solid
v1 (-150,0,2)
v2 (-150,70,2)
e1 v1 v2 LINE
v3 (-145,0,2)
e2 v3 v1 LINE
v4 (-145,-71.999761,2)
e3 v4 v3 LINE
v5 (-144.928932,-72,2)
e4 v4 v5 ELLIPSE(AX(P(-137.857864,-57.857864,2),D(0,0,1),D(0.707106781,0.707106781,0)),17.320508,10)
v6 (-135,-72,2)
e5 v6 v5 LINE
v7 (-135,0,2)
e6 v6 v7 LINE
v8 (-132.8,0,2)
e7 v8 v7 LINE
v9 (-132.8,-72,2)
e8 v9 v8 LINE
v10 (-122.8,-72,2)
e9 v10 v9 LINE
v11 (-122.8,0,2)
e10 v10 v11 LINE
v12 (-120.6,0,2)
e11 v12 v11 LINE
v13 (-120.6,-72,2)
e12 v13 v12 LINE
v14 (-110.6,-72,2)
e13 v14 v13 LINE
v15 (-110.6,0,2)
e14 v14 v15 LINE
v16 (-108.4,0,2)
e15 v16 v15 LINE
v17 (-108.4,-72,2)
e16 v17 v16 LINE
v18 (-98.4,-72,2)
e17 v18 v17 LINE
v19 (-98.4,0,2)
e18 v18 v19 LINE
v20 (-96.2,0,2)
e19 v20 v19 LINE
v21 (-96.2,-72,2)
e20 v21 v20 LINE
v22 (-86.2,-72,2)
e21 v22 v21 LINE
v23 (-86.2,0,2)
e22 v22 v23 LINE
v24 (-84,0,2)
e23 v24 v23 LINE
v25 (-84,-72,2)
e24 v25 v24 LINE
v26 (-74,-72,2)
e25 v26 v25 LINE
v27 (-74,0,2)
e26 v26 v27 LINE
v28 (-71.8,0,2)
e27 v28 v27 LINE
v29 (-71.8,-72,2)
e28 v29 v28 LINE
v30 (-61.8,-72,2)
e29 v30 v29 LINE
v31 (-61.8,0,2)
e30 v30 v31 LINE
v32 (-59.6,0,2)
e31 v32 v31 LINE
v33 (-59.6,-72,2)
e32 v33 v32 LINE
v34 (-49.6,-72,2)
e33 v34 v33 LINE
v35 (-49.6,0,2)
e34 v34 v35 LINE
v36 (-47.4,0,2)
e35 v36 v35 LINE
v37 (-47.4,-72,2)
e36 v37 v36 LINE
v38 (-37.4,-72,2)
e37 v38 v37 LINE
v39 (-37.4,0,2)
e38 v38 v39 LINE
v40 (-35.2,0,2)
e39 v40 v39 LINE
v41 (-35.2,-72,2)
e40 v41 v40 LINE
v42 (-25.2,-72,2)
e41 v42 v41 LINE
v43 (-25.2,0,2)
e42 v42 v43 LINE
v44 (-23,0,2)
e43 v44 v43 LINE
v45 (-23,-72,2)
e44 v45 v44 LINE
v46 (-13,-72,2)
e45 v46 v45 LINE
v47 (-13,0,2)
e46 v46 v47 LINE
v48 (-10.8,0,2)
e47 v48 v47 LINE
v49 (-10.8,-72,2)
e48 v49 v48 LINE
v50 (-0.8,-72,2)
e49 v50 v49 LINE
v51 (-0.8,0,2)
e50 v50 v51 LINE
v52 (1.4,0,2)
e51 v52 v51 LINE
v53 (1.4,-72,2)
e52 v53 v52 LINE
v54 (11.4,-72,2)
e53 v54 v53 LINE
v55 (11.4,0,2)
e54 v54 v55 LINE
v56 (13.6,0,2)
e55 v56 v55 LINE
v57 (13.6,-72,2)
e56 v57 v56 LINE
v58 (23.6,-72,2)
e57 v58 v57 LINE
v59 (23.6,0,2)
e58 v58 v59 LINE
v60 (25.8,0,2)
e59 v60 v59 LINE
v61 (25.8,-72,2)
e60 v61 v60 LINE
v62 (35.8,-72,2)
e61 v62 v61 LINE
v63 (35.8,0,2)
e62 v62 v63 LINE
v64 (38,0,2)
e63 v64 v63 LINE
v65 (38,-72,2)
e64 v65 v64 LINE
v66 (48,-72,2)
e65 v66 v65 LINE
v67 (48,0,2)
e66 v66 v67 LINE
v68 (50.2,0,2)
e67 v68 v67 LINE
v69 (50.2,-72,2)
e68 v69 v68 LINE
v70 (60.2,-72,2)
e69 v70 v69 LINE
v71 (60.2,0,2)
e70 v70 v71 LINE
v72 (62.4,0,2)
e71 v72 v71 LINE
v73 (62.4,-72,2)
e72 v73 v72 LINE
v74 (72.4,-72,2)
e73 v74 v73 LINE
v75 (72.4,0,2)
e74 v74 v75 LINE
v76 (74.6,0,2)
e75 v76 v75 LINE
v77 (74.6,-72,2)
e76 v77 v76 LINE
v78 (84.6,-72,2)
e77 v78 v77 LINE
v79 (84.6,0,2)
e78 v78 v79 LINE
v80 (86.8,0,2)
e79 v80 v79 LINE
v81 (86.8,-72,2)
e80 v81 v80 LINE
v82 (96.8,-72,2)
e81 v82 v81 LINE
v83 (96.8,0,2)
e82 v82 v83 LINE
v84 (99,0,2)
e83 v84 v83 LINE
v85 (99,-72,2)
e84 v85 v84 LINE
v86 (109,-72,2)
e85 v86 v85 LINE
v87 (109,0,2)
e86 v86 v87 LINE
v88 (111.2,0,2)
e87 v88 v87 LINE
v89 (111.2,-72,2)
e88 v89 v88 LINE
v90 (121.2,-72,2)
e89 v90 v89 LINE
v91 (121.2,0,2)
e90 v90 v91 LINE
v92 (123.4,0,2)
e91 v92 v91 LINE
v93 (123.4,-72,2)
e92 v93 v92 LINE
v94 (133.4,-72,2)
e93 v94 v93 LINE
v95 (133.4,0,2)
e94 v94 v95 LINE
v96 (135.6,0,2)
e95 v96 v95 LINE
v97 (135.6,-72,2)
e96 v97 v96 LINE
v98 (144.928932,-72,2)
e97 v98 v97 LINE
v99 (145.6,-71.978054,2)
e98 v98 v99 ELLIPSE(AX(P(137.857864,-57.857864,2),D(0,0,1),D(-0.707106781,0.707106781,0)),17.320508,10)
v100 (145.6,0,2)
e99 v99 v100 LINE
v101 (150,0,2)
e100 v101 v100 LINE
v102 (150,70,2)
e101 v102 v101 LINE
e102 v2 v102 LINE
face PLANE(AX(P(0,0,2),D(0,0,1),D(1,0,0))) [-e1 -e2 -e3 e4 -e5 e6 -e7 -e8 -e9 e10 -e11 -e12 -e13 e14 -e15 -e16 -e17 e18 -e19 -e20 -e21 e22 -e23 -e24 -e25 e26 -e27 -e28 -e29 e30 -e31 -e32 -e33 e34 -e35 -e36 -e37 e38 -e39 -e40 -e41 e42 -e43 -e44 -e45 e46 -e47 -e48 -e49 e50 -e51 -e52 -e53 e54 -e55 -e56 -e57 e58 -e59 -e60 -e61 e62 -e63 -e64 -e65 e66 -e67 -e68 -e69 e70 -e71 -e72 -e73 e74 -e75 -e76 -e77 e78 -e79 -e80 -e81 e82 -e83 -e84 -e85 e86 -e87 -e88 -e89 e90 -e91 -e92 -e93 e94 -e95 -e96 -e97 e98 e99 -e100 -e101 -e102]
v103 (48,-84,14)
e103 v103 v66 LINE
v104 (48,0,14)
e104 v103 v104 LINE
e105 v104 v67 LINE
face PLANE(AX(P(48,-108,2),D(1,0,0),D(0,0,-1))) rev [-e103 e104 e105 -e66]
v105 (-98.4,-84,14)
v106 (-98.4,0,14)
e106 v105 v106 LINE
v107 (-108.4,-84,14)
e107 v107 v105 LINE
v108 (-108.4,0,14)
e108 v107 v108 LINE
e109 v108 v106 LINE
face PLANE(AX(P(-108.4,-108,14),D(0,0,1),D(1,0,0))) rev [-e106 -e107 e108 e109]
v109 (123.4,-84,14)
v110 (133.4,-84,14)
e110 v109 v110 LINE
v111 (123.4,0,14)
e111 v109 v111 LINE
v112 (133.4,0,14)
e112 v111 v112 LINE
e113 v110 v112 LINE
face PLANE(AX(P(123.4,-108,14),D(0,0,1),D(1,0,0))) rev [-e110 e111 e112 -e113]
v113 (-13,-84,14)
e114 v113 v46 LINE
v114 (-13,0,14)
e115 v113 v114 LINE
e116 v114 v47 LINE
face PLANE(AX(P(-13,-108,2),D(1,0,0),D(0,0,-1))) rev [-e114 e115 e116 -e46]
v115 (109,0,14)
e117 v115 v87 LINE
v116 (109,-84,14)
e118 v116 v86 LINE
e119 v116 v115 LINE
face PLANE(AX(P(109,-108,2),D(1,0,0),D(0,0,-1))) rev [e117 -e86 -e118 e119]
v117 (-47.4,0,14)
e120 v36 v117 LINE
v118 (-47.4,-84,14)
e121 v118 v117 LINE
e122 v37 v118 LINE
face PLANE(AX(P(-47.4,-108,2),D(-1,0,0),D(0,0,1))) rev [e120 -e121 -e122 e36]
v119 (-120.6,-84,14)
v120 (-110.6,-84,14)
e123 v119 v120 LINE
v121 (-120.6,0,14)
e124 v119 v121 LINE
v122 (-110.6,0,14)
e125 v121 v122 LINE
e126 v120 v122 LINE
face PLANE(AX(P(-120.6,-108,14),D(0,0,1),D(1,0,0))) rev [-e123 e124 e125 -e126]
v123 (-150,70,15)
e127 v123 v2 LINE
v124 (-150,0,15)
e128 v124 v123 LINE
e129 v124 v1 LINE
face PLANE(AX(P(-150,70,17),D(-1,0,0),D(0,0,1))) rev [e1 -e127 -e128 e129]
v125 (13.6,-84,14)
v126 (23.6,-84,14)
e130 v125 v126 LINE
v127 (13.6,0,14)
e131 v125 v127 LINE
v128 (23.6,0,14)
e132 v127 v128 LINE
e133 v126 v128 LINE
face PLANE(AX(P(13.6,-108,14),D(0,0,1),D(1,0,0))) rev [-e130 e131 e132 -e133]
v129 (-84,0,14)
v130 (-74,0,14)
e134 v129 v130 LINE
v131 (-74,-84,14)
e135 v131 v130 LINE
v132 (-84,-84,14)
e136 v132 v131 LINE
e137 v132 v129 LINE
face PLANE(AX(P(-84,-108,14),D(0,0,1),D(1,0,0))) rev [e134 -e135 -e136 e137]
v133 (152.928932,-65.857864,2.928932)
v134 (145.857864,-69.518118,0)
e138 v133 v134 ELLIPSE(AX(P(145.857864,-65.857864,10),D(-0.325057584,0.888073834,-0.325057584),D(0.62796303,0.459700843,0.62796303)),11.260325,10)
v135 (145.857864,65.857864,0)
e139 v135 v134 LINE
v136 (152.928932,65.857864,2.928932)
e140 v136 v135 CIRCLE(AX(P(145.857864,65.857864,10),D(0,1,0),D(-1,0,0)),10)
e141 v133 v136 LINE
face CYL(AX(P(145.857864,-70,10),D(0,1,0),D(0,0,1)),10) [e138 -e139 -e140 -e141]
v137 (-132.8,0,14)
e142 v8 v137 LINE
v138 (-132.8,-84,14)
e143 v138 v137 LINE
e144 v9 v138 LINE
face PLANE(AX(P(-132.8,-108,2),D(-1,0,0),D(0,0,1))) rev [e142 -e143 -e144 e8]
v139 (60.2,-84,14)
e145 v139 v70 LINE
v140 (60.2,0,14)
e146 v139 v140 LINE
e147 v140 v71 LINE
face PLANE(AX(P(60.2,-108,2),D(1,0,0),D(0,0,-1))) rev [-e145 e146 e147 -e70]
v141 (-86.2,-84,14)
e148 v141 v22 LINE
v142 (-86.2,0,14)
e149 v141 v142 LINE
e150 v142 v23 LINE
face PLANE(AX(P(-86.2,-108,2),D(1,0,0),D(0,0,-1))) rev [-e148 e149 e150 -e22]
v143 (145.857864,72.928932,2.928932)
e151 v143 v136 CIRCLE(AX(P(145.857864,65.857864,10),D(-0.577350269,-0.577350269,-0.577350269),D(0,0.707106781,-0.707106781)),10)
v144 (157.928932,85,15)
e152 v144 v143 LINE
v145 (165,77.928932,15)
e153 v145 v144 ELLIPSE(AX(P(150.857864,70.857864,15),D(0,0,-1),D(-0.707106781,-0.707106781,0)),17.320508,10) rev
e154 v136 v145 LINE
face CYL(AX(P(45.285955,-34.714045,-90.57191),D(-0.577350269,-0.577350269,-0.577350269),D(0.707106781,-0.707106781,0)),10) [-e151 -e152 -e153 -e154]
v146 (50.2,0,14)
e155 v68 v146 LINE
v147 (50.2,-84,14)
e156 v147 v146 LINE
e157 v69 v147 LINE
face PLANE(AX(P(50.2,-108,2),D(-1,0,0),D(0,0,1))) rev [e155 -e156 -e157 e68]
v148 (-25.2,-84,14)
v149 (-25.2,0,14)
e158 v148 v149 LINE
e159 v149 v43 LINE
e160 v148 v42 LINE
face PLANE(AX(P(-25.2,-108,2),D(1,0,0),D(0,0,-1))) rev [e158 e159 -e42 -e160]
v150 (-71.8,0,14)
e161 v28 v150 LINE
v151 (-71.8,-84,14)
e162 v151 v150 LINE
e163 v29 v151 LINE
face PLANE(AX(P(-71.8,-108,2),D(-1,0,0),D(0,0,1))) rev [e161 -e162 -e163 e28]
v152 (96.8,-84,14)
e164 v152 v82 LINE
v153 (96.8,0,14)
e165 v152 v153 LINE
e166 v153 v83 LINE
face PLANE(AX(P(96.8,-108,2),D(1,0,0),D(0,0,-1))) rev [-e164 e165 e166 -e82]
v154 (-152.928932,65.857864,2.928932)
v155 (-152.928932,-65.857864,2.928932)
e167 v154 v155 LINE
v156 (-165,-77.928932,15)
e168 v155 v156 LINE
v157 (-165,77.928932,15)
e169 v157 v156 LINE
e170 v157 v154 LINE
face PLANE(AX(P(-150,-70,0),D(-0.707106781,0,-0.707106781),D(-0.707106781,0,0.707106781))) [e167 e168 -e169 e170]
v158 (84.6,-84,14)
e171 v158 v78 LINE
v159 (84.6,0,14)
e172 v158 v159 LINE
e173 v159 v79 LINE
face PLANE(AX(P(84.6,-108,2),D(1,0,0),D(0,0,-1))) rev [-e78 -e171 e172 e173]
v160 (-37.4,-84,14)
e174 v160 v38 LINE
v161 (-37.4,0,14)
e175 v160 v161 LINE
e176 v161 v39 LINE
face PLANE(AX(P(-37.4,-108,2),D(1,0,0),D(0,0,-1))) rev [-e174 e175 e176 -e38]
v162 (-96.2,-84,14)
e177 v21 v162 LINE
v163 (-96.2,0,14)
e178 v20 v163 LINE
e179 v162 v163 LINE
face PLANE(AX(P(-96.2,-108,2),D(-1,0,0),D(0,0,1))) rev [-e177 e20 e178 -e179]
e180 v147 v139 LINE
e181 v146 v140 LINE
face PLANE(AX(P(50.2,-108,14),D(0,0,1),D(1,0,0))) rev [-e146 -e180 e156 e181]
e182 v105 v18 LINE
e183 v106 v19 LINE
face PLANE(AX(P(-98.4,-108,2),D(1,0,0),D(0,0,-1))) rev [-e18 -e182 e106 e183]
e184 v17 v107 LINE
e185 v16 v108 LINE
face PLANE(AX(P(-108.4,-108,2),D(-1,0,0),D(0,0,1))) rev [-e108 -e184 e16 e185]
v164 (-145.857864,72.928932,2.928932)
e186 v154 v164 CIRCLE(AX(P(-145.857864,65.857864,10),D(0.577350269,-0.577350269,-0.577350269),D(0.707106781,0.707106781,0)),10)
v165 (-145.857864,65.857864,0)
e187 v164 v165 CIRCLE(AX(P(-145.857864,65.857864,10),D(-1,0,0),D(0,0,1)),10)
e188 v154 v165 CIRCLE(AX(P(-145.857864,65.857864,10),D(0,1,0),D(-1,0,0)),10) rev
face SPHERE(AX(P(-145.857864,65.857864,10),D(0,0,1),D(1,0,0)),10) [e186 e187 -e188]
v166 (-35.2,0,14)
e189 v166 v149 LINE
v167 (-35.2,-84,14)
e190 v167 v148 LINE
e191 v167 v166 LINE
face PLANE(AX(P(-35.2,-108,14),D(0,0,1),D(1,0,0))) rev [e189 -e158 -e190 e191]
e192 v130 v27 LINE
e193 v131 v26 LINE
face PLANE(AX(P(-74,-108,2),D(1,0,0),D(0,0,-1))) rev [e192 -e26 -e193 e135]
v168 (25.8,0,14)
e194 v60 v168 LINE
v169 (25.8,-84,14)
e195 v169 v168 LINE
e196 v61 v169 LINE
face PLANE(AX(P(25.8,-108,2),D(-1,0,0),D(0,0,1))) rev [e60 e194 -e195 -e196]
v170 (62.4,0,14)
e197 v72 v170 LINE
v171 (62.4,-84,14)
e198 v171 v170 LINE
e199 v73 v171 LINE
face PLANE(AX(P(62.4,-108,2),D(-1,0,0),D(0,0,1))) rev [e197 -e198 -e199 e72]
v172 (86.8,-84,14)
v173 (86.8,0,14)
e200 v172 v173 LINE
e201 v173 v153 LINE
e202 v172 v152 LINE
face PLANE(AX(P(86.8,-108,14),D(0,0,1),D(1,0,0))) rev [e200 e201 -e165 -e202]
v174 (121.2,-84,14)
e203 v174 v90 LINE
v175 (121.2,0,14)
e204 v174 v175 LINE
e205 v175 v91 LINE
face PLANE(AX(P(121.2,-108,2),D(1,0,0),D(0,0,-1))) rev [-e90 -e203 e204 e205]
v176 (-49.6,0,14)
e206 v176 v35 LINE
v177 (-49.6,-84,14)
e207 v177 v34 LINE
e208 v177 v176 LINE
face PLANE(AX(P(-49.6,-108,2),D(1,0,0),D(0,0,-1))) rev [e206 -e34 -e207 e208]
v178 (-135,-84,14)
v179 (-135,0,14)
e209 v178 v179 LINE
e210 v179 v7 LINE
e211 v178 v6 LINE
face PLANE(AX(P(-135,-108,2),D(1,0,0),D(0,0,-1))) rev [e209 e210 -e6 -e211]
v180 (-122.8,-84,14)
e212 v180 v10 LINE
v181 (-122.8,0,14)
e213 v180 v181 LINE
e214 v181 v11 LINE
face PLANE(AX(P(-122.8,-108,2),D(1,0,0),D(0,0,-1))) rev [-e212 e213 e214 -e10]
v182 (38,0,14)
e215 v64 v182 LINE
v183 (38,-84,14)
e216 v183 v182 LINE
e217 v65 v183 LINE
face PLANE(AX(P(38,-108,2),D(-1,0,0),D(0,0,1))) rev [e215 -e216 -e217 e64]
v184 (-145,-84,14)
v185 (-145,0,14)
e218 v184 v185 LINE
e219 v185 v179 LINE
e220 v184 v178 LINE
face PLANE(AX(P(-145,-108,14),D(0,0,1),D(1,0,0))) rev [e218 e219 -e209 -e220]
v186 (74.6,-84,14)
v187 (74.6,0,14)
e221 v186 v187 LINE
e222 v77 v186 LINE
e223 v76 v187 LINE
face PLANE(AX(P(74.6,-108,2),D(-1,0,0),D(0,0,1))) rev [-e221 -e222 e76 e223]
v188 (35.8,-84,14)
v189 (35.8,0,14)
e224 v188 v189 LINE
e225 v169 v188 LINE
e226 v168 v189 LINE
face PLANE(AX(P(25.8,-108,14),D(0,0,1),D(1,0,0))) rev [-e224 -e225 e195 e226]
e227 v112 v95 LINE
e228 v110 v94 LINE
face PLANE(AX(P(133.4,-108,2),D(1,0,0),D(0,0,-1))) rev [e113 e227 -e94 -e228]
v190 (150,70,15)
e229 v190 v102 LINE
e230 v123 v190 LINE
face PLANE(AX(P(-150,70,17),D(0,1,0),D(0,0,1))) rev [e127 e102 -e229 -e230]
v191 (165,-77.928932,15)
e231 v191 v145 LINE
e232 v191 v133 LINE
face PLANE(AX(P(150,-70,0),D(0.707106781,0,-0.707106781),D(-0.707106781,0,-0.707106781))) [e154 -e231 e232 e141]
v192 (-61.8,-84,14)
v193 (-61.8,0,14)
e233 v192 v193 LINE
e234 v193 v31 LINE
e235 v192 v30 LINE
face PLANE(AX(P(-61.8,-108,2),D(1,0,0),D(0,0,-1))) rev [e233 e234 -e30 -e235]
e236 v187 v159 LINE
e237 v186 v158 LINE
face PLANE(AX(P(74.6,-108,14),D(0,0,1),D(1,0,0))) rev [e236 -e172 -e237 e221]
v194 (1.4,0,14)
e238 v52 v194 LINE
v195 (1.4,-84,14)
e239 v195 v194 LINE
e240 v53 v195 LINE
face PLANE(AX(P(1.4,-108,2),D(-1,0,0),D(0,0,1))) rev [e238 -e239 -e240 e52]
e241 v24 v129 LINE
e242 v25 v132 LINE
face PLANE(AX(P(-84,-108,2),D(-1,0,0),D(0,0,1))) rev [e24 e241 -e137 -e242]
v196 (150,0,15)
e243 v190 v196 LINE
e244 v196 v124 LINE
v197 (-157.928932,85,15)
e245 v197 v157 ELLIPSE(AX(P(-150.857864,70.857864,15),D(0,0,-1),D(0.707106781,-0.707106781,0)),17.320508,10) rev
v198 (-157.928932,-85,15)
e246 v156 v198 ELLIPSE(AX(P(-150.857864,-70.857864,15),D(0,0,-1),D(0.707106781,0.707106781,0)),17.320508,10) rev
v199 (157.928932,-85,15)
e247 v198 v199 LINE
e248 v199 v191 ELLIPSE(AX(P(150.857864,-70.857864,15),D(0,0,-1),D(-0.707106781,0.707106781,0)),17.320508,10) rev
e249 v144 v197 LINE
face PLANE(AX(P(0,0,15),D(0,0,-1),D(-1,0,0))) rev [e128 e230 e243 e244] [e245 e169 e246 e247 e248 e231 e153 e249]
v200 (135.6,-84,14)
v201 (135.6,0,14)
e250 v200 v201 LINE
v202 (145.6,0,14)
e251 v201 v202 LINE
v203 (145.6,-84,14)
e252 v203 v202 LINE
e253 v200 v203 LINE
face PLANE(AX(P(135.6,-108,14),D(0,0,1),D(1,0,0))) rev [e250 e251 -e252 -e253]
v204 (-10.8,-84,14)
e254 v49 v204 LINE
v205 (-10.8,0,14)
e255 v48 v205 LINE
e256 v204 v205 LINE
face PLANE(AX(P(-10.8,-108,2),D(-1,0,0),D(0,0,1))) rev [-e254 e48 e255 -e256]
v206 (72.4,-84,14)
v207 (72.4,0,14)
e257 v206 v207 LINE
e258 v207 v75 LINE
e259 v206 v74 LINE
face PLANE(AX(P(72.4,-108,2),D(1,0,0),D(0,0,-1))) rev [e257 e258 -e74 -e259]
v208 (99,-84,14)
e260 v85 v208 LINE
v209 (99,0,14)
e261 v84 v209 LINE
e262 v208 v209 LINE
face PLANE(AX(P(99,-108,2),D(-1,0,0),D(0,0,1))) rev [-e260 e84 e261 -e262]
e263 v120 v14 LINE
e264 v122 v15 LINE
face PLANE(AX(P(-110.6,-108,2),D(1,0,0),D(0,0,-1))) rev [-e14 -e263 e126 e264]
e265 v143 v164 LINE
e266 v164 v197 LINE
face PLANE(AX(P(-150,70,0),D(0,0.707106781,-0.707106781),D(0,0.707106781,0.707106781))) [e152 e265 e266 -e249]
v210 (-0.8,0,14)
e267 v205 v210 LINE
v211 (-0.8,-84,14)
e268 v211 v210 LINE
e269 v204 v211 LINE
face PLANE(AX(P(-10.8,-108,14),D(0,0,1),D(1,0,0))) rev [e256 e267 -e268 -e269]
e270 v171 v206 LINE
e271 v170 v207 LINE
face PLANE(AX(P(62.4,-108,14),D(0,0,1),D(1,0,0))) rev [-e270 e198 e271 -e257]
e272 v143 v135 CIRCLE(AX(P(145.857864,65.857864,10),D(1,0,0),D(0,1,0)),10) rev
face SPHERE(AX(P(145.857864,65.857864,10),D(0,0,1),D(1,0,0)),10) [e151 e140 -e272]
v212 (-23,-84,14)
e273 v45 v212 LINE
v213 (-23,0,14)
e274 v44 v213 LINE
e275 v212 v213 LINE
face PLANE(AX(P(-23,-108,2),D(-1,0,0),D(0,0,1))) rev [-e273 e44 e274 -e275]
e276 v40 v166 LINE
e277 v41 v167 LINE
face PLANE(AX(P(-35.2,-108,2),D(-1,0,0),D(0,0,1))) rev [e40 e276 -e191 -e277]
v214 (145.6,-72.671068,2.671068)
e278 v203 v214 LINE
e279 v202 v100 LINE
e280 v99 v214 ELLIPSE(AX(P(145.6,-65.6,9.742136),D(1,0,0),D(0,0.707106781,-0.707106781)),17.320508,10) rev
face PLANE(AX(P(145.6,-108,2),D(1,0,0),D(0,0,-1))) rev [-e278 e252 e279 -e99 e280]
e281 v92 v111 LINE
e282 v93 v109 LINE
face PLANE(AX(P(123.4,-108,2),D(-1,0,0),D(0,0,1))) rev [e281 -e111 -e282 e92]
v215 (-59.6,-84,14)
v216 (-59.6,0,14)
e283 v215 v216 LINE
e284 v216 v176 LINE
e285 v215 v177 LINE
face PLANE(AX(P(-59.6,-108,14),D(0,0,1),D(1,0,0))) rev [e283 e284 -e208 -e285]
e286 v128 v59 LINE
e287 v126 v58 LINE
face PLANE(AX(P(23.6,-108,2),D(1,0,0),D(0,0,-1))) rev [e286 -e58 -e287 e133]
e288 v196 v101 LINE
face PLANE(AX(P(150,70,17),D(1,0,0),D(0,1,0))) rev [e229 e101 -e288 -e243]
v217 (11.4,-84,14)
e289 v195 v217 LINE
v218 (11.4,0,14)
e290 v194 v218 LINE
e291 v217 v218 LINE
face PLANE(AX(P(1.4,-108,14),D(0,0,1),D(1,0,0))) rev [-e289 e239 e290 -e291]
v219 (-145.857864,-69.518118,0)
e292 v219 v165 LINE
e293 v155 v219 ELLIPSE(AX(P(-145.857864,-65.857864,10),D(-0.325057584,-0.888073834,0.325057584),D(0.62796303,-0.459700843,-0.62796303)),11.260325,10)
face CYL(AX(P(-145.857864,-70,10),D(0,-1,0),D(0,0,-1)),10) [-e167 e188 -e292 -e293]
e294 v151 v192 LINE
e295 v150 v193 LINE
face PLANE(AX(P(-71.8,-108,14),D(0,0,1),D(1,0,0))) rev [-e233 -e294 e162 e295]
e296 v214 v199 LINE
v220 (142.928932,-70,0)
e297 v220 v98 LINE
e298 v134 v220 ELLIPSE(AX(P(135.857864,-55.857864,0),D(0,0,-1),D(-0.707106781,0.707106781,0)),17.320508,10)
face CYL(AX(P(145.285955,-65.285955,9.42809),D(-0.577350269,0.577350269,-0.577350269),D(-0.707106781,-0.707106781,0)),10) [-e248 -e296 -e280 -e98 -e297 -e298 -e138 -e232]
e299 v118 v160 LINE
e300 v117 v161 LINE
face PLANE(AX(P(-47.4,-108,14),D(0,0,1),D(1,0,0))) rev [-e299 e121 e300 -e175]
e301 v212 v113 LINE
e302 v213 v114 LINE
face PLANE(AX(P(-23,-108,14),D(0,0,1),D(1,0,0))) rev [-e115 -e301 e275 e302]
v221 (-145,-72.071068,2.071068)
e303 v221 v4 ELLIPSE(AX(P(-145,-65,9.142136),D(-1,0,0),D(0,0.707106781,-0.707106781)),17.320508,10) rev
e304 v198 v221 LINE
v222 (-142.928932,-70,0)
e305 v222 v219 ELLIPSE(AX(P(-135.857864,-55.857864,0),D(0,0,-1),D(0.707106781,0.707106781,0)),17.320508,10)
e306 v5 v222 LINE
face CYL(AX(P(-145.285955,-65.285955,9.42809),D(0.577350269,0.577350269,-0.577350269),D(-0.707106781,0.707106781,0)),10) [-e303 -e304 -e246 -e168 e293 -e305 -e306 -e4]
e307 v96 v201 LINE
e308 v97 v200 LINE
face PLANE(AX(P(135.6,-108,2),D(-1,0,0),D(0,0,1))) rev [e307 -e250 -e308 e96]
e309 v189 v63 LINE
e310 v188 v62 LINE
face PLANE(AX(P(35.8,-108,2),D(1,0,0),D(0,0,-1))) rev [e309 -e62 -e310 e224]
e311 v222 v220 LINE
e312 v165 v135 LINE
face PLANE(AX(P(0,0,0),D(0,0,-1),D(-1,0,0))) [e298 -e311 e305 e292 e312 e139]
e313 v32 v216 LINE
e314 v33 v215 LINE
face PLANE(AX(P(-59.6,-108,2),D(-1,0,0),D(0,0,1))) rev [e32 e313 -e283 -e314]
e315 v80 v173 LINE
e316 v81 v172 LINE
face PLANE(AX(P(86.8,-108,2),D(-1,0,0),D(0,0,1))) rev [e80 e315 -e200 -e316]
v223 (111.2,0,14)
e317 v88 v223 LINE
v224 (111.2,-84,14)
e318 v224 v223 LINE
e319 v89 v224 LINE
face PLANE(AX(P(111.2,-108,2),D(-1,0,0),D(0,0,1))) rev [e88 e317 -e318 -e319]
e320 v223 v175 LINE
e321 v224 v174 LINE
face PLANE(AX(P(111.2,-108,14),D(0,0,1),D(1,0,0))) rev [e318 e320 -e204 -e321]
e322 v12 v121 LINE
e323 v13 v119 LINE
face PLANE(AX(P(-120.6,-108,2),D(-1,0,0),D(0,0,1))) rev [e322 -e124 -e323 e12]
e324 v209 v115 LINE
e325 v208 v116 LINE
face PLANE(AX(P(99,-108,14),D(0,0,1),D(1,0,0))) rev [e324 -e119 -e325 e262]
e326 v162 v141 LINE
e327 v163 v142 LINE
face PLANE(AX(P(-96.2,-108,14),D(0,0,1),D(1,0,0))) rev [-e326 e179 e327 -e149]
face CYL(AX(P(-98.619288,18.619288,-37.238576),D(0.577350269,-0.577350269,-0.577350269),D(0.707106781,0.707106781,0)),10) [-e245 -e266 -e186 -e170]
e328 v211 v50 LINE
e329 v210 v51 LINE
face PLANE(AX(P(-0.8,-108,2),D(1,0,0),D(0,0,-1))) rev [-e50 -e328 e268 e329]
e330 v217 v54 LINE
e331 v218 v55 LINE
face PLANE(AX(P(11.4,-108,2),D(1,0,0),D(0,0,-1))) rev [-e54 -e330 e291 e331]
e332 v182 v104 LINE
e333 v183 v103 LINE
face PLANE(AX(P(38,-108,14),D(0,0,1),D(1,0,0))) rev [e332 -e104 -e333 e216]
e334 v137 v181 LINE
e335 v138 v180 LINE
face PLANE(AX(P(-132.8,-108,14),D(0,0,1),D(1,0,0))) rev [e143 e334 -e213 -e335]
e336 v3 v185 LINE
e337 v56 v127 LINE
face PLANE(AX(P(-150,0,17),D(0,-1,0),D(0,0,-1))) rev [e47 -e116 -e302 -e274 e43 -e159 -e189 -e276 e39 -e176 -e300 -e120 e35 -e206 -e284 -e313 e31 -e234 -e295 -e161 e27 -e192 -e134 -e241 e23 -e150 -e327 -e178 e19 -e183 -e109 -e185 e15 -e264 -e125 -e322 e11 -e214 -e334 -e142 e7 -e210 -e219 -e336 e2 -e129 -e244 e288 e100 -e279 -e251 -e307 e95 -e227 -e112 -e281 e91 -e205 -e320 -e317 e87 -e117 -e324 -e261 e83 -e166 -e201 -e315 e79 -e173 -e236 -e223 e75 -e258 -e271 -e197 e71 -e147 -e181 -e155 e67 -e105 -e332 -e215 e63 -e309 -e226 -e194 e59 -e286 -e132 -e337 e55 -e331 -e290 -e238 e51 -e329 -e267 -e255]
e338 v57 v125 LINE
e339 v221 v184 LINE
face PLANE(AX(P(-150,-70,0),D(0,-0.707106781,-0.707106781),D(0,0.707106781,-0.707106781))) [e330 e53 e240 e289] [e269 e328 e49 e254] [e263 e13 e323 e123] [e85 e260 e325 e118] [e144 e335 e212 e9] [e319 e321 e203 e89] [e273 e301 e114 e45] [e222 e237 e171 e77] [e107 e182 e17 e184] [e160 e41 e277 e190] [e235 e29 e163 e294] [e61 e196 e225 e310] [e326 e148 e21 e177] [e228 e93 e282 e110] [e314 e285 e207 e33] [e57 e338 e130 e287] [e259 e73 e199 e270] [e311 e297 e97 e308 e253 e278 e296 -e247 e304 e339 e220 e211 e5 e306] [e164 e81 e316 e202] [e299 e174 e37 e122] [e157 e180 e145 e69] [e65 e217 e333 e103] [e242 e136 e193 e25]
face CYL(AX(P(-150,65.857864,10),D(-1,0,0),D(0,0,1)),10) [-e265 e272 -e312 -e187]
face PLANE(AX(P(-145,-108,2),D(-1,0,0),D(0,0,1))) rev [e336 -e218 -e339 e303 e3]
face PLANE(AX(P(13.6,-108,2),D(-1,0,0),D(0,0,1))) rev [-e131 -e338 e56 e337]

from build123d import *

# Parameters (mm, degrees)
SZKIC1_W                    = 300
SZKIC1_H                    = 140
DODANIE_WYCI_GNI_CIE1_DEPTH = 15
DODANIE_WYCI_GNI_CIE1_DRAFT = -45
SZKIC2_W                    = 300
SZKIC2_H                    = 70
WYTNIJ_WYCI_GNI_CIE1_DEPTH  = 15
SZKIC3_W                    = 10
SZKIC3_H                    = 12
WYTNIJ_WYCI_GNI_CIE2_DEPTH  = 108
ZAOKR_GLENIE1_R             = 10


with BuildPart() as part:
    # Szkic1 → Dodanie-wyciągnięcie1 (with draft: the straight prism first)
    with BuildSketch(Plane.XY):
        Rectangle(SZKIC1_W, SZKIC1_H)
    extrude(amount=DODANIE_WYCI_GNI_CIE1_DEPTH)
    # Dodanie-wyciągnięcie1: the draft: its side faces are tilted about the plane it starts from
    dodanie_wyci_gni_cie1_sides = [part.faces().sort_by_distance(p)[0] for p in [
        (0, -70, 7.5),
        (150, 0, 7.5),
        (0, 70, 7.5),
        (-150, 0, 7.5),
    ]]
    draft(dodanie_wyci_gni_cie1_sides, Plane.XY, DODANIE_WYCI_GNI_CIE1_DRAFT)

    # Szkic2 → Wytnij-wyciągnięcie1 (cut)
    with BuildSketch(Plane(origin=(0, 0, 2), x_dir=(-1, 0, 0), z_dir=(0, 0, -1))):
        with Locations((0, 35)):
            Rectangle(SZKIC2_W, SZKIC2_H)
    extrude(amount=-WYTNIJ_WYCI_GNI_CIE1_DEPTH, mode=Mode.SUBTRACT)

    # Szkic3 → Wytnij-wyciągnięcie2 (cut)
    with BuildSketch(Plane(origin=(0, 0, 0), x_dir=(1, 0, 0), z_dir=(0, 1, 0))):
        with Locations((-140, -8)):
            Rectangle(SZKIC3_W, SZKIC3_H)
        with Locations((-127.8, -8)):
            Rectangle(SZKIC3_W, SZKIC3_H)
        with Locations((-115.6, -8)):
            Rectangle(SZKIC3_W, SZKIC3_H)
        with Locations((-103.4, -8)):
            Rectangle(SZKIC3_W, SZKIC3_H)
        with Locations((-91.2, -8)):
            Rectangle(SZKIC3_W, SZKIC3_H)
        with Locations((-79, -8)):
            Rectangle(SZKIC3_W, SZKIC3_H)
        with Locations((-66.8, -8)):
            Rectangle(SZKIC3_W, SZKIC3_H)
        with Locations((-54.6, -8)):
            Rectangle(SZKIC3_W, SZKIC3_H)
        with Locations((-42.4, -8)):
            Rectangle(SZKIC3_W, SZKIC3_H)
        with Locations((-30.2, -8)):
            Rectangle(SZKIC3_W, SZKIC3_H)
        with Locations((-18, -8)):
            Rectangle(SZKIC3_W, SZKIC3_H)
        with Locations((-5.8, -8)):
            Rectangle(SZKIC3_W, SZKIC3_H)
        with Locations((6.4, -8)):
            Rectangle(SZKIC3_W, SZKIC3_H)
        with Locations((18.6, -8)):
            Rectangle(SZKIC3_W, SZKIC3_H)
        with Locations((30.8, -8)):
            Rectangle(SZKIC3_W, SZKIC3_H)
        with Locations((43, -8)):
            Rectangle(SZKIC3_W, SZKIC3_H)
        with Locations((55.2, -8)):
            Rectangle(SZKIC3_W, SZKIC3_H)
        with Locations((67.4, -8)):
            Rectangle(SZKIC3_W, SZKIC3_H)
        with Locations((79.6, -8)):
            Rectangle(SZKIC3_W, SZKIC3_H)
        with Locations((91.8, -8)):
            Rectangle(SZKIC3_W, SZKIC3_H)
        with Locations((104, -8)):
            Rectangle(SZKIC3_W, SZKIC3_H)
        with Locations((116.2, -8)):
            Rectangle(SZKIC3_W, SZKIC3_H)
        with Locations((128.4, -8)):
            Rectangle(SZKIC3_W, SZKIC3_H)
        with Locations((140.6, -8)):
            Rectangle(SZKIC3_W, SZKIC3_H)
    extrude(amount=-WYTNIJ_WYCI_GNI_CIE2_DEPTH, mode=Mode.SUBTRACT)

    # Zaokrąglenie1
    # the kernel refuses this fillet: 10 mm, written as the material it takes off along each edge
    with BuildSketch(Plane(origin=(-145.857864376, 65.857864376, 10), x_dir=(-0.35740674433659364, 0.8628562094610169, 0.3574067443365923), z_dir=(-0.2705980500730978, 0.2705980500730978, -0.9238795325112871))) as zaokr_glenie1_piece_1_section:
        Polygon((-13.907299812, -13.907299812), (13.907299812, -13.907299812), (13.907299812, 13.907299812), (-13.907299812, 13.907299812), align=None)
    zaokr_glenie1_piece_1 = extrude(amount=13.907299812, mode=Mode.PRIVATE)
    zaokr_glenie1_piece_1 = split(zaokr_glenie1_piece_1, bisect_by=Plane(origin=(-145.857864376, 65.857864376, 10), z_dir=(0, 1, 0)), keep=Keep.TOP, mode=Mode.PRIVATE)
    zaokr_glenie1_piece_1 = split(zaokr_glenie1_piece_1, bisect_by=Plane(origin=(-145.857864376, 65.857864376, 10), z_dir=(-1, 0, 0)), keep=Keep.TOP, mode=Mode.PRIVATE)
    zaokr_glenie1_piece_1 = split(zaokr_glenie1_piece_1, bisect_by=Plane(origin=(-145.857864376, 65.857864376, 10), z_dir=(0.5773502691896265, -0.5773502691896265, -0.5773502691896244)), keep=Keep.TOP, mode=Mode.PRIVATE)
    zaokr_glenie1_piece_1 = split(zaokr_glenie1_piece_1, bisect_by=Plane(origin=(-152.928932188, 65.857864376, 2.928932188), z_dir=(0.7071067811865462, 0, 0.7071067811865488)), keep=Keep.TOP, mode=Mode.PRIVATE)
    zaokr_glenie1_piece_1 = split(zaokr_glenie1_piece_1, bisect_by=Plane(origin=(-145.857864376, 65.857864376, 0), z_dir=(0, 0, 1)), keep=Keep.TOP, mode=Mode.PRIVATE)
    zaokr_glenie1_piece_1 = split(zaokr_glenie1_piece_1, bisect_by=Plane(origin=(-145.857864376, 72.928932188, 2.928932188), z_dir=(0, -0.7071067811865462, 0.7071067811865488)), keep=Keep.TOP, mode=Mode.PRIVATE)
    zaokr_glenie1_piece_1 = zaokr_glenie1_piece_1 - Plane(origin=(-145.857864376, 65.857864376, 10), x_dir=(0.2705980500730978, -0.2705980500730978, 0.9238795325112871), z_dir=(-0.35740674433659364, 0.8628562094610169, 0.3574067443365923)) * Sphere(ZAOKR_GLENIE1_R, mode=Mode.PRIVATE)
    add(zaokr_glenie1_piece_1, mode=Mode.SUBTRACT)
    with BuildSketch(Plane(origin=(145.857864376, 65.857864376, 10), x_dir=(-0.7071067811865475, 0.7071067811865475, 0), z_dir=(0.2705980500730978, 0.2705980500730978, -0.9238795325112871))) as zaokr_glenie1_piece_2_section:
        Polygon((-13.907299812, -13.907299812), (13.907299812, -13.907299812), (13.907299812, 13.907299812), (-13.907299812, 13.907299812), align=None)
    zaokr_glenie1_piece_2 = extrude(amount=13.907299812, mode=Mode.PRIVATE)
    zaokr_glenie1_piece_2 = split(zaokr_glenie1_piece_2, bisect_by=Plane(origin=(145.857864376, 65.857864376, 10), z_dir=(0, 1, 0)), keep=Keep.TOP, mode=Mode.PRIVATE)
    zaokr_glenie1_piece_2 = split(zaokr_glenie1_piece_2, bisect_by=Plane(origin=(145.857864376, 65.857864376, 10), z_dir=(-0.5773502691896265, -0.5773502691896265, -0.5773502691896244)), keep=Keep.TOP, mode=Mode.PRIVATE)
    zaokr_glenie1_piece_2 = split(zaokr_glenie1_piece_2, bisect_by=Plane(origin=(145.857864376, 65.857864376, 10), z_dir=(1, 0, 0)), keep=Keep.TOP, mode=Mode.PRIVATE)
    zaokr_glenie1_piece_2 = split(zaokr_glenie1_piece_2, bisect_by=Plane(origin=(145.857864376, 65.857864376, 0), z_dir=(0, 0, 1)), keep=Keep.TOP, mode=Mode.PRIVATE)
    zaokr_glenie1_piece_2 = split(zaokr_glenie1_piece_2, bisect_by=Plane(origin=(152.928932188, 65.857864376, 2.928932188), z_dir=(-0.7071067811865462, 0, 0.7071067811865488)), keep=Keep.TOP, mode=Mode.PRIVATE)
    zaokr_glenie1_piece_2 = split(zaokr_glenie1_piece_2, bisect_by=Plane(origin=(145.857864376, 72.928932188, 2.928932188), z_dir=(0, -0.7071067811865462, 0.7071067811865488)), keep=Keep.TOP, mode=Mode.PRIVATE)
    zaokr_glenie1_piece_2 = zaokr_glenie1_piece_2 - Plane(origin=(145.857864376, 65.857864376, 10), x_dir=(-0.2705980500730978, -0.2705980500730978, 0.9238795325112871), z_dir=(-0.7071067811865475, 0.7071067811865475, 0)) * Sphere(ZAOKR_GLENIE1_R, mode=Mode.PRIVATE)
    add(zaokr_glenie1_piece_2, mode=Mode.SUBTRACT)
    with BuildSketch(Plane(origin=(-150, 65.857864376, 0), x_dir=(-0.7071067811865438, 0, 0.7071067811865511), z_dir=(0, -1, 0))) as zaokr_glenie1_piece_3:
        with BuildLine():
            CenterArc((ZAOKR_GLENIE1_R * 0.414213562373, -ZAOKR_GLENIE1_R), ZAOKR_GLENIE1_R, 90, 45)
            Line((-ZAOKR_GLENIE1_R * 0.292893218813, -ZAOKR_GLENIE1_R * 0.292893218813), (0, 0))
            Line((0, 0), (ZAOKR_GLENIE1_R * 0.414213562373, 0))
        make_face()
    extrude(amount=146.213203436, mode=Mode.SUBTRACT)
    with BuildSketch(Plane(origin=(145.857864376, 70, 0), x_dir=(0, -1, 0), z_dir=(-1, 0, 0))) as zaokr_glenie1_piece_4:
        with BuildLine():
            CenterArc((ZAOKR_GLENIE1_R * 0.414213562373, ZAOKR_GLENIE1_R), ZAOKR_GLENIE1_R, 225, 45)
            Line((-ZAOKR_GLENIE1_R * 0.292893218813, ZAOKR_GLENIE1_R * 0.292893218813), (0, 0))
            Line((0, 0), (ZAOKR_GLENIE1_R * 0.414213562373, 0))
        make_face()
    extrude(amount=291.715728753, mode=Mode.SUBTRACT)
    with BuildSketch(Plane(origin=(150, -80.355339059, 0), x_dir=(-1, 0, 0), z_dir=(0, 1, 0))) as zaokr_glenie1_piece_5:
        with BuildLine():
            CenterArc((ZAOKR_GLENIE1_R * 0.414213562373, ZAOKR_GLENIE1_R), ZAOKR_GLENIE1_R, 225, 45)
            Line((-ZAOKR_GLENIE1_R * 0.292893218813, ZAOKR_GLENIE1_R * 0.292893218813), (0, 0))
            Line((0, 0), (ZAOKR_GLENIE1_R * 0.414213562373, 0))
        make_face()
    extrude(amount=146.213203436, mode=Mode.SUBTRACT)
    with BuildSketch(Plane(origin=(141.666666667, -61.666666667, -8.333333333), x_dir=(-0.8164965809277256, -0.40824829046386363, 0.40824829046386335), z_dir=(0.5773502691896265, -0.5773502691896265, 0.5773502691896244))) as zaokr_glenie1_piece_6:
        with BuildLine():
            CenterArc((ZAOKR_GLENIE1_R * 0.57735026919, -ZAOKR_GLENIE1_R), ZAOKR_GLENIE1_R, 90, 60)
            Line((-ZAOKR_GLENIE1_R * 0.288675134595, -ZAOKR_GLENIE1_R * 0.5), (0, 0))
            Line((0, 0), (ZAOKR_GLENIE1_R * 0.57735026919, 0))
        make_face()
    extrude(amount=54.848275573, mode=Mode.SUBTRACT)
    with BuildSketch(Plane(origin=(-141.666666667, -61.666666667, -8.333333333), x_dir=(0.8164965809277256, -0.40824829046386546, 0.40824829046386146), z_dir=(-0.5773502691896265, -0.5773502691896265, 0.5773502691896244))) as zaokr_glenie1_piece_7:
        with BuildLine():
            CenterArc((ZAOKR_GLENIE1_R * 0.57735026919, ZAOKR_GLENIE1_R), ZAOKR_GLENIE1_R, 210, 60)
            Line((-ZAOKR_GLENIE1_R * 0.288675134595, ZAOKR_GLENIE1_R * 0.5), (0, 0))
            Line((0, 0), (ZAOKR_GLENIE1_R * 0.57735026919, 0))
        make_face()
    extrude(amount=54.848275573, mode=Mode.SUBTRACT)
    with BuildSketch(Plane(origin=(-150.571909584, 70.571909584, 0.571909584), x_dir=(-0.4082482904638678, -0.8164965809277256, 0.40824829046385913), z_dir=(-0.5773502691896265, 0.5773502691896265, 0.5773502691896244))) as zaokr_glenie1_piece_8:
        with BuildLine():
            CenterArc((ZAOKR_GLENIE1_R * 0.57735026919, ZAOKR_GLENIE1_R), ZAOKR_GLENIE1_R, 210, 60)
            Line((-ZAOKR_GLENIE1_R * 0.288675134595, ZAOKR_GLENIE1_R * 0.5), (0, 0))
            Line((0, 0), (ZAOKR_GLENIE1_R * 0.57735026919, 0))
        make_face()
    extrude(amount=39.423942386, mode=Mode.SUBTRACT)
    with BuildSketch(Plane(origin=(150.571909584, 70.571909584, 0.571909584), x_dir=(0.4082482904638637, -0.8164965809277256, 0.4082482904638634), z_dir=(0.5773502691896265, 0.5773502691896265, 0.5773502691896244))) as zaokr_glenie1_piece_9:
        with BuildLine():
            CenterArc((ZAOKR_GLENIE1_R * 0.57735026919, -ZAOKR_GLENIE1_R), ZAOKR_GLENIE1_R, 90, 60)
            Line((-ZAOKR_GLENIE1_R * 0.288675134595, -ZAOKR_GLENIE1_R * 0.5), (0, 0))
            Line((0, 0), (ZAOKR_GLENIE1_R * 0.57735026919, 0))
        make_face()
    extrude(amount=39.423942386, mode=Mode.SUBTRACT)


solid = part.part
